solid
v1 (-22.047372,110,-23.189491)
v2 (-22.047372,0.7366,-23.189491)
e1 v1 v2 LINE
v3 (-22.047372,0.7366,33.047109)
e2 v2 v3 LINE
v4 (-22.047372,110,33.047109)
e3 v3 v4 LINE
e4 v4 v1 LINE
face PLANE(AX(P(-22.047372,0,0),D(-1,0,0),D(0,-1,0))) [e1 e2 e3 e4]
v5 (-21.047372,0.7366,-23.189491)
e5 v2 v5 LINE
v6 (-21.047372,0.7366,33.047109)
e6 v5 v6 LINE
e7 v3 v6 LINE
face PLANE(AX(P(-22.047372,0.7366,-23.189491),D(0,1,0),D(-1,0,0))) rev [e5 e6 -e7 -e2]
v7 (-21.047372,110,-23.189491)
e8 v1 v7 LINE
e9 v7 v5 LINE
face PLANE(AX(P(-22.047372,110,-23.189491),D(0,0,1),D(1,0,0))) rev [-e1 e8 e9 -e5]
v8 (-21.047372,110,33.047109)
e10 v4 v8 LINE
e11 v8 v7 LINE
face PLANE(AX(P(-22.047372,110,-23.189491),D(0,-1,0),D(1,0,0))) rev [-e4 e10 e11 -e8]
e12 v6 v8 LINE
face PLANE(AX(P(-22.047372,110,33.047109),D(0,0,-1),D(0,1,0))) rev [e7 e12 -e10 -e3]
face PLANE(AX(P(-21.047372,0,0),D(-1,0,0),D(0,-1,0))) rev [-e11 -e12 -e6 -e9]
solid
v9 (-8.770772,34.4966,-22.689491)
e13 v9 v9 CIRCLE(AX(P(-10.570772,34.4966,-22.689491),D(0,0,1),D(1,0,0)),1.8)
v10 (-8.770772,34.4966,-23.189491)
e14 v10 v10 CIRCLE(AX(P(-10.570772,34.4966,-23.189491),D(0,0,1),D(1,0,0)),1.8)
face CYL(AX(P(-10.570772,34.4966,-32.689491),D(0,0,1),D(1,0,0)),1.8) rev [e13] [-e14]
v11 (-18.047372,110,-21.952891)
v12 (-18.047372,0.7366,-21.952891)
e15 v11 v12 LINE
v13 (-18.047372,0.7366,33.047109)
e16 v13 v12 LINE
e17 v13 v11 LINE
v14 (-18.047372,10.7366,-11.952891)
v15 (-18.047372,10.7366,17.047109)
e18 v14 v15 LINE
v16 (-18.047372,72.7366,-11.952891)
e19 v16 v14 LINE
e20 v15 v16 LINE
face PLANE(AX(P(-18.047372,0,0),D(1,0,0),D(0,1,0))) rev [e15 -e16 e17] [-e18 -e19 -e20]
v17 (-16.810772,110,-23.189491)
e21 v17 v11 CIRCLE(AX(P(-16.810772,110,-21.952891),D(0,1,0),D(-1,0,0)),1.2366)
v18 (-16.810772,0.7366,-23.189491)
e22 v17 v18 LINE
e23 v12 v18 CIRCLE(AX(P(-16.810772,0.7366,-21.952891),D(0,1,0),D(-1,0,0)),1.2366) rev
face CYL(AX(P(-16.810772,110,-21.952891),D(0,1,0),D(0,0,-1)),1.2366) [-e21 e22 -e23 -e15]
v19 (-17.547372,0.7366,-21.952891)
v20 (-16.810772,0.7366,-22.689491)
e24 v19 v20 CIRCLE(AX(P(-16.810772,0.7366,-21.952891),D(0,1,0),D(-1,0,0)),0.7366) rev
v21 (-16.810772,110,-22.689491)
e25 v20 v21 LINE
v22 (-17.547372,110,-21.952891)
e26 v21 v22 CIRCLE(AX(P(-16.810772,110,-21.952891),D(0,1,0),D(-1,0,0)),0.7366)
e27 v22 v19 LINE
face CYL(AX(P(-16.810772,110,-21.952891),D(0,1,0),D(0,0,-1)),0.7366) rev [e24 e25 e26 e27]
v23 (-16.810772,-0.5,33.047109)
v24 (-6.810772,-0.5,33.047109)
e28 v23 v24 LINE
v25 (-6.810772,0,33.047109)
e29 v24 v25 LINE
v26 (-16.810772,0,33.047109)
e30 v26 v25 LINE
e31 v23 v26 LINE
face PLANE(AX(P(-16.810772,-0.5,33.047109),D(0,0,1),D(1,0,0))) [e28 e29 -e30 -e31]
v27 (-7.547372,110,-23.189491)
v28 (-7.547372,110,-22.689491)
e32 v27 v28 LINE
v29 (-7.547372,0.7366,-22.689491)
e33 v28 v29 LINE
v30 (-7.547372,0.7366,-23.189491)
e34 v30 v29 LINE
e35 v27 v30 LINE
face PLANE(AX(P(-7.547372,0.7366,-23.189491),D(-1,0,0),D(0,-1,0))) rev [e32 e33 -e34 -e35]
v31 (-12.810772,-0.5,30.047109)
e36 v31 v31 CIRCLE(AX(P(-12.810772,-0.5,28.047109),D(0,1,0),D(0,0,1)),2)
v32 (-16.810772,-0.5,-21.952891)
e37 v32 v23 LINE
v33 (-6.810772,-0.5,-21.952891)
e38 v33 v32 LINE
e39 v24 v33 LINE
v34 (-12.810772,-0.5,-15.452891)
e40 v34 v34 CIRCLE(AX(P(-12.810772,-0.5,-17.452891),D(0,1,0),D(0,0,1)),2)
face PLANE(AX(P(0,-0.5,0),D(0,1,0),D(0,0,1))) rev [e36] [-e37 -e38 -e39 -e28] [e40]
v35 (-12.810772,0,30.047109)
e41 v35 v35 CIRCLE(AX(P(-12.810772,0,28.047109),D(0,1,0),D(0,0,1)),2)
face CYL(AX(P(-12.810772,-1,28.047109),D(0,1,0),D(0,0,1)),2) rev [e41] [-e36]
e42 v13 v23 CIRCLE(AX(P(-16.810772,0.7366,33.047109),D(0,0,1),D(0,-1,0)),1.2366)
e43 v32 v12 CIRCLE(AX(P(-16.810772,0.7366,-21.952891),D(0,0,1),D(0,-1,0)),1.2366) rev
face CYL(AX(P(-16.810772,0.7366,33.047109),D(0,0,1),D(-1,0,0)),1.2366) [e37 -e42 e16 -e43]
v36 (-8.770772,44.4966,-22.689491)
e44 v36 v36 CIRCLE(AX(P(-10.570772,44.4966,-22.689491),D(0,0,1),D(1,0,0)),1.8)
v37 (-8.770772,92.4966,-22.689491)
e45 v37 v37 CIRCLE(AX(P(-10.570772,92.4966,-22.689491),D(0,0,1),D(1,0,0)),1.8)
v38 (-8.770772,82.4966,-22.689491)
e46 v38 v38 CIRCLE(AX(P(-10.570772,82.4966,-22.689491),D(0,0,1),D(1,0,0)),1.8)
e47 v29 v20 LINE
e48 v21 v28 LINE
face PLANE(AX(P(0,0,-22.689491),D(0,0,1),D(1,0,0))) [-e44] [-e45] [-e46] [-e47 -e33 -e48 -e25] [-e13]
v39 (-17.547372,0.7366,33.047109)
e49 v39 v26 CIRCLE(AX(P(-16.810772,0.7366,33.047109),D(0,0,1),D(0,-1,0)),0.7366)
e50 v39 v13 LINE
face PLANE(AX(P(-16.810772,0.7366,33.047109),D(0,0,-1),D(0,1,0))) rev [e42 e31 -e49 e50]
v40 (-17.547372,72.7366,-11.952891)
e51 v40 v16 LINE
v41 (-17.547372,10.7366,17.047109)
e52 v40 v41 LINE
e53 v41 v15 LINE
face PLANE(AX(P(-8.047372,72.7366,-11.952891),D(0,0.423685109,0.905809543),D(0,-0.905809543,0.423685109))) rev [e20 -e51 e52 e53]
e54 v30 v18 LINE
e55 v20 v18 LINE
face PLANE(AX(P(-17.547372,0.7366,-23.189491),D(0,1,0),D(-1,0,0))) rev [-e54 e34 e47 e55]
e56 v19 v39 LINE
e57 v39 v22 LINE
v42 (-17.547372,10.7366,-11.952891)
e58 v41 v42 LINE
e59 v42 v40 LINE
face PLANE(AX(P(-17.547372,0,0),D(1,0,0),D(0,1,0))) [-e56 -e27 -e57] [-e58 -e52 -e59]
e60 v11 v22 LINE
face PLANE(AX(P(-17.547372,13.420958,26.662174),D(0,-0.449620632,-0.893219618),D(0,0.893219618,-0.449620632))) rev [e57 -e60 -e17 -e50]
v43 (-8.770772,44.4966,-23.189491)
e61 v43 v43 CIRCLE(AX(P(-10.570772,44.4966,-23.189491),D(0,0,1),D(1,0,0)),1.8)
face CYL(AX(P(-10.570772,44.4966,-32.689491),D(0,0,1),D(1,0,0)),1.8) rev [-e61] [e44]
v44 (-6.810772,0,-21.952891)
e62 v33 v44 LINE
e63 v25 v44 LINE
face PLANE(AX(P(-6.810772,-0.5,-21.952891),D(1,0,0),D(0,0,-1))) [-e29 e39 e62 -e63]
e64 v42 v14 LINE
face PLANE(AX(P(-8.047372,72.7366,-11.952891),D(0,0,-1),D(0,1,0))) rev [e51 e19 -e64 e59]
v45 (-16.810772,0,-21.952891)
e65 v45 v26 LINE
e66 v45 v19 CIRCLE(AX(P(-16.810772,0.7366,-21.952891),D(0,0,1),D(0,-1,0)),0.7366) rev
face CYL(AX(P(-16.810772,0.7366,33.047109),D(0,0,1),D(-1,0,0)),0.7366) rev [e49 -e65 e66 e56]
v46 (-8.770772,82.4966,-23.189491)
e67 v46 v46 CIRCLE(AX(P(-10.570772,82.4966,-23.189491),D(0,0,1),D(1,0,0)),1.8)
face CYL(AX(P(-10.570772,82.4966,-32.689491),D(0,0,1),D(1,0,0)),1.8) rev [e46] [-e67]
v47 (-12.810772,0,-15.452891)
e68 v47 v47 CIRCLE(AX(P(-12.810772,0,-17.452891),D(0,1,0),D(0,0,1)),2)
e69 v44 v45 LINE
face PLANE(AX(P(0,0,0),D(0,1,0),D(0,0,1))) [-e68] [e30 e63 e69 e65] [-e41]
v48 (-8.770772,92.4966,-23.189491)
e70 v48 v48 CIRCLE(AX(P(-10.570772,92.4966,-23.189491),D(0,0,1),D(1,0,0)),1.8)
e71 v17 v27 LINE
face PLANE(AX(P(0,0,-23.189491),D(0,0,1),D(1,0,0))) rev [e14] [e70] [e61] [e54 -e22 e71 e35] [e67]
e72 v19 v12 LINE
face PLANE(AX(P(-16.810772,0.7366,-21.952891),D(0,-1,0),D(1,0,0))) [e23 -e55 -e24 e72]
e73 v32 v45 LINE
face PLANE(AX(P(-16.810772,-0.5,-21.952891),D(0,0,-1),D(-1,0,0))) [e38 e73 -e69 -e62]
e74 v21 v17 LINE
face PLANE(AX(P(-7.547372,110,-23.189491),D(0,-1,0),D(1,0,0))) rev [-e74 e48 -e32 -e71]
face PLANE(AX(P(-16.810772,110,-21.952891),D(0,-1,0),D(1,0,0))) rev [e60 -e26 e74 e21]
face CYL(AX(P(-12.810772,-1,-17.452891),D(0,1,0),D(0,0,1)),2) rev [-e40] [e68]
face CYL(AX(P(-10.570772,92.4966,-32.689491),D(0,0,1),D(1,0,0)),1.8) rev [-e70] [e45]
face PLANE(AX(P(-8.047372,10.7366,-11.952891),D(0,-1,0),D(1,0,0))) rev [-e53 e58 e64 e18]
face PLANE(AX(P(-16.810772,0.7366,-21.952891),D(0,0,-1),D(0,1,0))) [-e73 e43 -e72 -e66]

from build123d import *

# Parameters (mm, degrees)
SKETCH1_W           = 10
SKETCH1_H           = 55
BASE_FLANGE1_DEPTH  = 0.5
EDGE_FLANGE1_DEPTH  = 55
EDGE_FLANGE2_DEPTH  = 109.2634
SKETCH13_R          = 2
CUT_EXTRUDE1_DEPTH  = 1
CUT_EXTRUDE2_DEPTH  = 10
CUT_EXTRUDE7_DEPTH  = 10
BOSS_EXTRUDE1_START = 3
SKETCH16_W          = 56.2366
SKETCH16_H          = 109.2634
BOSS_EXTRUDE1_DEPTH = 1
SKETCH19_R          = 1.8
CUT_EXTRUDE4_DEPTH  = 10
SKETCH17_R          = 1.8
CUT_EXTRUDE5_DEPTH  = 10
SKETCH20_R          = 1.8
CUT_EXTRUDE6_DEPTH  = 10


# Sheet-metal steps are written as plain solids
with BuildPart() as part:
    # Sketch1 → Base-Flange1 (new body)
    with BuildSketch(Plane(origin=(0, 0, 0), x_dir=(1, 0, 0), z_dir=(0, 1, 0))):
        with Locations((-11.810772495, -5.547108859)):
            Rectangle(SKETCH1_W, SKETCH1_H)
    extrude(amount=-BASE_FLANGE1_DEPTH)

    # Edge-Flange1 section (across the edge) → Edge-Flange1 (add)
    with BuildSketch(Plane(origin=(-17.547372495, 0, -21.952891141), x_dir=(1, 0, 0), z_dir=(0, 0, 1))):
        with BuildLine():
            Line((-0.5, 0.7366), (-0.5, 110))
            Line((-0.5, 110), (0, 110))
            Line((0, 110), (0, 0.7366))
            ThreePointArc((0, 0.7366), (0.215745145, 0.215745145), (0.7366, 0))
            Line((0.7366, 0), (0.7366, -0.5))
            ThreePointArc((0.7366, -0.5), (-0.137808246, -0.137808246), (-0.5, 0.7366))
        make_face()
    extrude(amount=EDGE_FLANGE1_DEPTH)

    # Edge-Flange2 section (across the edge) → Edge-Flange2 (add)
    with BuildSketch(Plane(origin=(-17.547372495, 0.7366, -22.689491141), x_dir=(0, 0, 1), z_dir=(0, 1, 0))):
        with BuildLine():
            Line((-0.5, 0.7366), (-0.5, 10))
            Line((-0.5, 10), (0, 10))
            Line((0, 10), (0, 0.7366))
            ThreePointArc((0, 0.7366), (0.215745145, 0.215745145), (0.7366, 0))
            Line((0.7366, 0), (0.7366, -0.5))
            ThreePointArc((0.7366, -0.5), (-0.137808246, -0.137808246), (-0.5, 0.7366))
        make_face()
    extrude(amount=EDGE_FLANGE2_DEPTH)

    # Sketch13 → Cut-Extrude1 (cut)
    with BuildSketch(Plane(origin=(0, 0, 0), x_dir=(1, 0, 0), z_dir=(0, 1, 0))):
        with Locations(Location((-12.810772495, 17.452891141, 0), (0, 0, 270))):
            Circle(SKETCH13_R)
        with Locations(Location((-12.810772495, -28.047108859, 0), (0, 0, 270))):
            Circle(SKETCH13_R)
    extrude(amount=-CUT_EXTRUDE1_DEPTH, mode=Mode.SUBTRACT)

    # Sketch14 → Cut-Extrude2 (cut)
    with BuildSketch(Plane.ZY.offset(18.047372495)):
        Polygon((-21.952891141, 110), (33.047108859, 0.7366), (33.047108859, 110), align=None)
    extrude(amount=-CUT_EXTRUDE2_DEPTH, mode=Mode.SUBTRACT)

    # Sketch21 → Cut-Extrude7 (cut)
    with BuildSketch(Plane.ZY.offset(18.047372495)):
        Polygon((-11.952891141, 72.7366), (-11.952891141, 10.7366), (17.047108859, 10.7366), align=None)
    extrude(amount=-CUT_EXTRUDE7_DEPTH, mode=Mode.SUBTRACT)

    # Sketch19 → Cut-Extrude4 (cut)
    with BuildSketch(Plane.XY.offset(-22.689491141)):
        with Locations((-10.570772495, 34.4966)):
            Circle(SKETCH19_R)
    extrude(amount=-CUT_EXTRUDE4_DEPTH, mode=Mode.SUBTRACT)

    # Sketch17 → Cut-Extrude5 (cut)
    with BuildSketch(Plane.XY.offset(-22.689491141)):
        with Locations((-10.570772495, 44.4966)):
            Circle(SKETCH17_R)
    extrude(amount=-CUT_EXTRUDE5_DEPTH, mode=Mode.SUBTRACT)

    # Sketch20 → Cut-Extrude6 (cut)
    with BuildSketch(Plane.XY.offset(-22.689491141)):
        with Locations((-10.570772495, 82.4966)):
            Circle(SKETCH20_R)
        with Locations((-10.570772495, 92.4966)):
            Circle(SKETCH20_R)
    extrude(amount=-CUT_EXTRUDE6_DEPTH, mode=Mode.SUBTRACT)


with BuildPart() as body_2:
    # Sketch16 → Boss-Extrude1 (new body)
    with BuildSketch(Plane.ZY.offset(18.047372495).offset(BOSS_EXTRUDE1_START)):
        with Locations((4.928808859, 55.3683)):
            Rectangle(SKETCH16_W, SKETCH16_H)
    extrude(amount=BOSS_EXTRUDE1_DEPTH)


solid = Compound([part.part, body_2.part])
